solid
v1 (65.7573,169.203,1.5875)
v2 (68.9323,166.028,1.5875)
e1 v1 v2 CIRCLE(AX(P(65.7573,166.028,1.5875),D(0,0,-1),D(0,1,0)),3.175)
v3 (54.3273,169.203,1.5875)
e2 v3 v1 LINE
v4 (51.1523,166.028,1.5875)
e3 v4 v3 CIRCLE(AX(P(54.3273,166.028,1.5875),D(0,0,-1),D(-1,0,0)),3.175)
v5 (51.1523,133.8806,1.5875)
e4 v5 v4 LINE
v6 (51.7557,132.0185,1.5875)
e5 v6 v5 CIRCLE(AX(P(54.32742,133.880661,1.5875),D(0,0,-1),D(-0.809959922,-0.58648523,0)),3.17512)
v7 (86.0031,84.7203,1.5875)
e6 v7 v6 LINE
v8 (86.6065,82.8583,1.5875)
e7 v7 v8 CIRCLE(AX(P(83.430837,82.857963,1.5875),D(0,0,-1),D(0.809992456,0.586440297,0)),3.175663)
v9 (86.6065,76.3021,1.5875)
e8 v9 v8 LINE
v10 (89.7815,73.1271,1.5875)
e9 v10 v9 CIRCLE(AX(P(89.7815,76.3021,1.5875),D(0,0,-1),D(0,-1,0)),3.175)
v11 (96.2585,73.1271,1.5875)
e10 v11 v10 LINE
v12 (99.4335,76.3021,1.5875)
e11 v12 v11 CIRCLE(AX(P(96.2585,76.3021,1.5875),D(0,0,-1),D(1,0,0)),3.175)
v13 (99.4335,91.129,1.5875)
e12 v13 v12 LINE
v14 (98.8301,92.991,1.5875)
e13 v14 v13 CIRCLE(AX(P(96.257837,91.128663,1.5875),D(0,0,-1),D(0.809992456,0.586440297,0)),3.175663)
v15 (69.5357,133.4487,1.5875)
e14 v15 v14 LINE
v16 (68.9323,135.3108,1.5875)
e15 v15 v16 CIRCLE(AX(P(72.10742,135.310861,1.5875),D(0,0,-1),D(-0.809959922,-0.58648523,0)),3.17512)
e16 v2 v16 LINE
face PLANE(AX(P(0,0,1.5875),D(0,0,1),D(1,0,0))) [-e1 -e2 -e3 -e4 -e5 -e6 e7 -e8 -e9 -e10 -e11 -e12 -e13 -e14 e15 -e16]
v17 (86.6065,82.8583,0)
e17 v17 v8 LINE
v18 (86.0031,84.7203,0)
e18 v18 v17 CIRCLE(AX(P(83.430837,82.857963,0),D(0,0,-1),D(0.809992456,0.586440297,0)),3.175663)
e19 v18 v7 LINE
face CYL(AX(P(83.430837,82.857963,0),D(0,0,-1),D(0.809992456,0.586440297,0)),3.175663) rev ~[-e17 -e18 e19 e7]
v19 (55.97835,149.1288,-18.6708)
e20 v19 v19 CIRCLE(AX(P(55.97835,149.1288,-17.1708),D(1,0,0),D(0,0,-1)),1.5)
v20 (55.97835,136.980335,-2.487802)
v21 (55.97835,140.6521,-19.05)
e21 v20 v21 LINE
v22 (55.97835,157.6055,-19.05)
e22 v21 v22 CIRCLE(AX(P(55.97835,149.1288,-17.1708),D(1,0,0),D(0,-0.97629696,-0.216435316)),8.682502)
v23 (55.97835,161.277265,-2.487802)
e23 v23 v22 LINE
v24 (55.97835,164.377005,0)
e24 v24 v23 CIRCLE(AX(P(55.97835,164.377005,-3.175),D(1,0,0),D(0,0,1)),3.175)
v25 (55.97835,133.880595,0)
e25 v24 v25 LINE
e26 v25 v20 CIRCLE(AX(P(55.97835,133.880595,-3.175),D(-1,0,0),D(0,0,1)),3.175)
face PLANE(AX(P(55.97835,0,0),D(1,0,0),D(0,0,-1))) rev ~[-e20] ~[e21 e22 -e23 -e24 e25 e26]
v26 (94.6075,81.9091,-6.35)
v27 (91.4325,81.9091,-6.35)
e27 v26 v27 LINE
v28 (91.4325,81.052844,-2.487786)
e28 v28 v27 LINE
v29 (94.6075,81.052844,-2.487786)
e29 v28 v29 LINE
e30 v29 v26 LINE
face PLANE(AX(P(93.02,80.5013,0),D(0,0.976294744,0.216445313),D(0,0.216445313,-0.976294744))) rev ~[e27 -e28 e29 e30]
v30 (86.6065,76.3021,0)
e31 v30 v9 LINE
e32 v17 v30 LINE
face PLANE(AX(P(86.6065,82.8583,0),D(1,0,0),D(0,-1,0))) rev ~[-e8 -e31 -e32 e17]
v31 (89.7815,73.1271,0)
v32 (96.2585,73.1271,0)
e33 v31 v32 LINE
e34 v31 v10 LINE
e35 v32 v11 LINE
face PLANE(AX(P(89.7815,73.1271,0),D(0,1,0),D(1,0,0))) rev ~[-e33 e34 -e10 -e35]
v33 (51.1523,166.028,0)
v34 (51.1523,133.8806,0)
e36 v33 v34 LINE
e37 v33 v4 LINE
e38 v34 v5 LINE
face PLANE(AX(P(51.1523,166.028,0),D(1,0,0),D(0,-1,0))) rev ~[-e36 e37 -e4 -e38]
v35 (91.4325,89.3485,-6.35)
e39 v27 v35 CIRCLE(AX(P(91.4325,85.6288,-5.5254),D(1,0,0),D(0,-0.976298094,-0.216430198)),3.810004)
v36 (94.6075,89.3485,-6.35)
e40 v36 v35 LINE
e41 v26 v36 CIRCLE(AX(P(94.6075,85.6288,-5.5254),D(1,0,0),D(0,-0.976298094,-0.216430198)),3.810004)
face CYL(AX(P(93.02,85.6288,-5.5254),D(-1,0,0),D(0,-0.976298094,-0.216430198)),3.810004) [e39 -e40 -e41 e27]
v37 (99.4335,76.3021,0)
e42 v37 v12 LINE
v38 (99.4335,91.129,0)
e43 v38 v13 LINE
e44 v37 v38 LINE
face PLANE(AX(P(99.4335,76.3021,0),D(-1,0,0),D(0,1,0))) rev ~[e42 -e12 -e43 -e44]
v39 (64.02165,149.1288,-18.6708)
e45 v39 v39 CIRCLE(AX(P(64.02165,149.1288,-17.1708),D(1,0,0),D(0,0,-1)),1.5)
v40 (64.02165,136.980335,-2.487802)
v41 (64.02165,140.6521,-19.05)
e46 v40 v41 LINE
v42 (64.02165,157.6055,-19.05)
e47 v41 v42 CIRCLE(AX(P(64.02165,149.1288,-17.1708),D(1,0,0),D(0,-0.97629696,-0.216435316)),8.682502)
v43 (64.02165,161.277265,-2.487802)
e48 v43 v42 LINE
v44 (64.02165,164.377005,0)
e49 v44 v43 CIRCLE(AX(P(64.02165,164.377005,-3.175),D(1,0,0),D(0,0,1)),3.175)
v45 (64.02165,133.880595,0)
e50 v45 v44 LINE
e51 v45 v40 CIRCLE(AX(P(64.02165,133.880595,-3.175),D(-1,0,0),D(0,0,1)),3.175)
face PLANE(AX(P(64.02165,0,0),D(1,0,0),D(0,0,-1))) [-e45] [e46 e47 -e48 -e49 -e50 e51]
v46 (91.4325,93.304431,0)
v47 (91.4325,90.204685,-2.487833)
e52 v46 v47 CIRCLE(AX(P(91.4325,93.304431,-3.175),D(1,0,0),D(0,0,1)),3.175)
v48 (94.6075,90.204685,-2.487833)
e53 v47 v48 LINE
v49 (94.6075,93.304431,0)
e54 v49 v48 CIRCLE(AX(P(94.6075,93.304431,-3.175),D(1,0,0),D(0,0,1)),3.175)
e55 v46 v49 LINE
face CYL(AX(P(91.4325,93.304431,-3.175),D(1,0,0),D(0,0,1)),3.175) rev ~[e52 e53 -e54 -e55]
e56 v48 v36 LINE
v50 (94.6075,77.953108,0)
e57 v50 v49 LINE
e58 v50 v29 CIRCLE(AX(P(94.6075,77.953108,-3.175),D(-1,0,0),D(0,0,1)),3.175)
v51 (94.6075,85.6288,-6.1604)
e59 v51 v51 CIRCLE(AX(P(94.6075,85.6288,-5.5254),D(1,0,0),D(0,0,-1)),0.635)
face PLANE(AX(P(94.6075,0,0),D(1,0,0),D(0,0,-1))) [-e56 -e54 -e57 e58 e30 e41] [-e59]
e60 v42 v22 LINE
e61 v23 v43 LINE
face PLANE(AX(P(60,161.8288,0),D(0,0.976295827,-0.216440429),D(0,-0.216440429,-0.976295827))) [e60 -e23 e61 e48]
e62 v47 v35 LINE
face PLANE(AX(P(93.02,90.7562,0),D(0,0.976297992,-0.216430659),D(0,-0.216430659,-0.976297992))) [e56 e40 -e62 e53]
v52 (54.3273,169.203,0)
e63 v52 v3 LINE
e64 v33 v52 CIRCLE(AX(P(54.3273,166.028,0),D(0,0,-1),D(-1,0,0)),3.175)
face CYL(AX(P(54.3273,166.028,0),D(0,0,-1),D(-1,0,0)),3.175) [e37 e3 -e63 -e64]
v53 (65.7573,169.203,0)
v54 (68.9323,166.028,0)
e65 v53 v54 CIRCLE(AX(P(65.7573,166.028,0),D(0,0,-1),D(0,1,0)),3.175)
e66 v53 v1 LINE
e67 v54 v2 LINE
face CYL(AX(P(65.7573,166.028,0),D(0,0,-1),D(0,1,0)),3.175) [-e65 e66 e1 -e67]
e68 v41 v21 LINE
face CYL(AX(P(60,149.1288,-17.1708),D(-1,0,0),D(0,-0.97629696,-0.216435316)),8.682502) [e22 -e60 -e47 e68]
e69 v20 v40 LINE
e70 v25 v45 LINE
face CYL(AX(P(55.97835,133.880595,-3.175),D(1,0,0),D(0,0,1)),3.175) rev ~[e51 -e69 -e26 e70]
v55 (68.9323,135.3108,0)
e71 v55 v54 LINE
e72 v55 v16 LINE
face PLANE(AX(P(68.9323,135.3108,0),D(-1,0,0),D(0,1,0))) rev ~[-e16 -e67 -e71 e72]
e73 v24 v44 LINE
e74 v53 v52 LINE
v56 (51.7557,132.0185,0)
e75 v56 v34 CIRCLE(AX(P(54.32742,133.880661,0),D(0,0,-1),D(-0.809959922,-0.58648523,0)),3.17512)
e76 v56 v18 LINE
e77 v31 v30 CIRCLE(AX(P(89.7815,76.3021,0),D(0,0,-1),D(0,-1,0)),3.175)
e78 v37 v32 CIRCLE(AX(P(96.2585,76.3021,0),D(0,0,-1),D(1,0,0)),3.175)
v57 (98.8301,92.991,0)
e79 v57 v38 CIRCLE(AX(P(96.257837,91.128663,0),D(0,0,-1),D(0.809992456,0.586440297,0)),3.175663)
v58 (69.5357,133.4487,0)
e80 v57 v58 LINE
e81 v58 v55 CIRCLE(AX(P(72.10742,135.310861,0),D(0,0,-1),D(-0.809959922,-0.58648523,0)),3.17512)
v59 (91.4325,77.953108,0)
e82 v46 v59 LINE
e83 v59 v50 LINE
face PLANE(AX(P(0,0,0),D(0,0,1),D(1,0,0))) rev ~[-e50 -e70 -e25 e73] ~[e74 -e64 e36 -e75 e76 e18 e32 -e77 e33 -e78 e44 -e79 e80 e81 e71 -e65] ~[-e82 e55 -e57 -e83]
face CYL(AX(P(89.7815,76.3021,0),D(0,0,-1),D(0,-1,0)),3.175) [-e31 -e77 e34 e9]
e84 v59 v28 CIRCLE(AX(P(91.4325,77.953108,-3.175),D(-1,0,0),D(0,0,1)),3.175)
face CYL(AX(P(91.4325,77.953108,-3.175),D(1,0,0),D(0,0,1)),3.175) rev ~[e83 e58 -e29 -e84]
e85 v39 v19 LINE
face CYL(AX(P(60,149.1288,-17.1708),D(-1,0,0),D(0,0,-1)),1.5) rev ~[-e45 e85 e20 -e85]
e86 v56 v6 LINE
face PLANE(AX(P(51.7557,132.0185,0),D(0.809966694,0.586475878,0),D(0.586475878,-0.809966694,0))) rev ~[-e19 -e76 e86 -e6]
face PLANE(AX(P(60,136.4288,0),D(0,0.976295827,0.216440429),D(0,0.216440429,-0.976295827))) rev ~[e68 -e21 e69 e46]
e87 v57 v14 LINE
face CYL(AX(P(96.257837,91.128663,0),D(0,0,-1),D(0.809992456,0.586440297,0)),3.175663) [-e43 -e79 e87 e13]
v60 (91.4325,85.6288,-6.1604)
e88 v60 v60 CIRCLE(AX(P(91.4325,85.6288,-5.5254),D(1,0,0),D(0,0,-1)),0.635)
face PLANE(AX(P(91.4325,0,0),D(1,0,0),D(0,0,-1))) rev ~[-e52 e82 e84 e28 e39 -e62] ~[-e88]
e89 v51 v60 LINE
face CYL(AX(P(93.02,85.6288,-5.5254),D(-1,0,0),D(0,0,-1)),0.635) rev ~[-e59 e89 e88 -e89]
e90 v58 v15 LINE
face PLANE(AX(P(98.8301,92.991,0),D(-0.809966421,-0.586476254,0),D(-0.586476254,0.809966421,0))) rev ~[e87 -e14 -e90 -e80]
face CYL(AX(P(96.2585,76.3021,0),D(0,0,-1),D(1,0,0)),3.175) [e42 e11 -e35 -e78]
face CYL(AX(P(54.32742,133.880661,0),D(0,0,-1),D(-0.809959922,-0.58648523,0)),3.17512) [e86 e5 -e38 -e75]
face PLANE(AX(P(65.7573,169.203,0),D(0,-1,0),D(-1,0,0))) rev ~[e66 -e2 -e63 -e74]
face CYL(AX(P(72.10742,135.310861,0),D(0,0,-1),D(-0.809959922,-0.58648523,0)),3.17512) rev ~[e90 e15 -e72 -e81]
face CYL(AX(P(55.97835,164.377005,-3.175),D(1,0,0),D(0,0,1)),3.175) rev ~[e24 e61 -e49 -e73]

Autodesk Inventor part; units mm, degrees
ref_plane "YZ Plane" through (0, 0, 0) normal (1, 0, 0) x (0, 1, 0)
ref_plane "XZ Plane" through (0, 0, 0) normal (0, 1, 0) x (-1, 0, 0)
sketch "Sketch1" plane through (0, 0, 0) normal (0, 0, 1) x (1, 0, 0)
  line L0 (0, 0) -> (120, 0)
  line L1 (120, 0) -> (120, 198.5)
  line L2 (120, 198.5) -> (0, 198.5)
  line L3 (0, 198.5) -> (0, 0)
  dimension "d0" = 120
  dimension "d1" = 198.5
extrude "Extrusion1" add sketch "Sketch1" along normal blind 1.5875
ref_plane "Work Plane1" through (60, 0, 0) normal (1, 0, 0) x (0, 0, -1)
sketch "Sketch2" plane through (60, 0, 0) normal (1, 0, 0) x (0, 0, -1)
  line L0 (0, 161.8288) -> (19.05, 157.6055)
  line L1 (0, 136.4288) -> (19.05, 140.6521)
  line L2 (0, 178.6416) -> (0, 113.5366)
  arc A0 (19.05, 140.6521) -> (19.05, 157.6055) centre (17.1708, 149.1288) ccw
  circle A1 centre (17.1708, 149.1288) radius 1.5
  line L3 (0, 0) -> (0, 198.5) projected
  dimension "d4" = 25.4
  dimension "d7" = 19.05
  dimension "d8" = 102.5
  dimension "d9" = 102.5
  dimension "d10" = 3
extrude "Extrusion2" add sketch "Sketch2" along normal mid plane 8.0433
fillet "Fillet1" radius 3.175 2 edges at (60, 136.4288, 0) (60, 161.8288, 0)
ref_plane "Work Plane2" through (93.02, 0, 0) normal (1, 0, 0) x (0, 0, -1)
sketch "Sketch3" plane through (93.02, 0, 0) normal (1, 0, 0) x (0, 0, -1)
  line L0 (0, 90.7562) -> (6.35, 89.3485)
  line L1 (0, 80.5013) -> (6.35, 81.9091)
  line L2 (0, 0) -> (0, 198.5) projected
  arc A0 (6.35, 81.9091) -> (6.35, 89.3485) centre (5.5254, 85.6288) ccw
  circle A1 centre (5.5254, 85.6288) radius 0.635
  circle A2 centre (17.1708, 149.1288) radius 1.5 projected
  line L3 (0, 90.7562) -> (0, 80.5013)
  dimension "d14" = 6.35
  dimension "d15" = 102.5
  dimension "d16" = 102.5
  dimension "d17" = 1.27
  dimension "d18" = 3.175
  dimension "d19" = 63.5
extrude "Extrusion3" add sketch "Sketch3" along normal mid plane 3.175 contours L0 A0 L1 L2
fillet "Fillet2" radius 3.175 2 edges at (93.02, 90.7562, 0) (93.02, 80.5013, 0)
sketch "Sketch6" plane through (0, 0, 0) normal (0, 0, -1) x (-1, 0, 0)
  line L0 (0, 0) -> (-120, 0) projected
  line L1 (0, 198.5) -> (0, 0) projected
  line L2 (-120, 198.5) -> (0, 198.5) projected
  line L3 (-120, 0) -> (-120, 198.5) projected
  line L4 (-89.7815, 73.1271) -> (-96.2585, 73.1271)
  line L5 (-65.7573, 169.203) -> (-54.3273, 169.203)
  line L6 (-51.1523, 166.028) -> (-51.1523, 133.8806)
  line L7 (-51.7557, 132.0185) -> (-86.0031, 84.7203)
  line L8 (-86.6065, 82.8583) -> (-86.6065, 76.3021)
  arc A0 (-86.0031, 84.7203) -> (-86.6065, 82.8583) centre (-83.4315, 82.8583) ccw
  arc A1 (-51.1523, 166.028) -> (-54.3273, 169.203) centre (-54.3273, 166.028) ccw
  arc A2 (-51.7557, 132.0185) -> (-51.1523, 133.8806) centre (-54.3273, 133.8806) ccw
  arc A3 (-89.7815, 73.1271) -> (-86.6065, 76.3021) centre (-89.7815, 76.3021) ccw
  arc A4 (-99.4335, 76.3021) -> (-96.2585, 73.1271) centre (-96.2585, 76.3021) ccw
  line L9 (-55.9783, 164.377) -> (-64.0217, 164.377) projected
  line L10 (-99.4335, 76.3021) -> (-99.4335, 91.129)
  line L11 (-98.8301, 92.991) -> (-69.5357, 133.4487)
  line L12 (-68.9323, 135.3108) -> (-68.9323, 166.028)
  arc A5 (-65.7573, 169.203) -> (-68.9323, 166.028) centre (-65.7573, 166.028) ccw
  arc A6 (-98.8301, 92.991) -> (-99.4335, 91.129) centre (-96.2585, 91.129) ccw
  arc A7 (-69.5357, 133.4487) -> (-68.9323, 135.3108) centre (-72.1073, 135.3108) ccw
  line L13 (-55.9783, 164.377) -> (-55.9783, 133.8806) projected
  line L14 (-64.0217, 133.8806) -> (-64.0217, 164.377) projected
  line L15 (-94.6075, 77.9531) -> (-94.6075, 93.3044) projected
  line L16 (-91.4325, 93.3044) -> (-91.4325, 77.9531) projected
  line L17 (-94.6075, 77.9531) -> (-91.4325, 77.9531) projected
  line L18 (-64.0217, 133.8806) -> (-55.9783, 133.8806) projected
  dimension "d24" = 3.175
  dimension "d27" = 3.175
  dimension "d28" = 15.24
  dimension "d30" = 17.78
  dimension "d31" = 3.175
  dimension "d32" = 3.175
  dimension "d33" = 3.175
  dimension "d34" = 3.175
  dimension "d35" = 3.175
  dimension "d36" = 3.175
  dimension "d37" = 4.826
  dimension "d38" = 4.9107
  dimension "d39" = 4.826
  dimension "d40" = 4.826
  dimension "d41" = 4.826
  dimension "d43" = 4.826
extrude "Extrusion4" cut sketch "Sketch6" against normal through all contours L0 L3 L2 L1
equation "\"d0\" = TabletWidth"
equation "\"d1\" = TabletHeight"
equation "\"d4\" = PivotWidth"
equation "\"d7\" = PivotHeight"
equation "\"d8\" = PivotAngle"
equation "\"d9\" = PivotAngle"
equation "\"d10\" = HingeHoleDiameter"
equation "\"d22\" = d18"
equation "\"d15\" = PivotAngle"
equation "\"d16\" = PivotAngle"
equation "\"d20\" = d18"
equation "\"d23\" = d18"
equation "\"d24\" = d18"
equation "\"d27\" = d18"
equation "\"d31\" = d18"
equation "\"d39\" = d37"
equation "\"d40\" = d37"
equation "\"d41\" = d37"
equation "\"d43\" = d37"
equation "\"TabletWidth\" = 120"
equation "\"TabletHeight\" = 198.5"
equation "\"PivotWidth\" = 25.4"
equation "\"PivotHeight\" = 19.05"
equation "\"PivotAngle\" = 102.5deg"
equation "\"HingeHoleDiameter\" = 3"
properties part number "TableMount-Holder" material "ABS Plastic"
